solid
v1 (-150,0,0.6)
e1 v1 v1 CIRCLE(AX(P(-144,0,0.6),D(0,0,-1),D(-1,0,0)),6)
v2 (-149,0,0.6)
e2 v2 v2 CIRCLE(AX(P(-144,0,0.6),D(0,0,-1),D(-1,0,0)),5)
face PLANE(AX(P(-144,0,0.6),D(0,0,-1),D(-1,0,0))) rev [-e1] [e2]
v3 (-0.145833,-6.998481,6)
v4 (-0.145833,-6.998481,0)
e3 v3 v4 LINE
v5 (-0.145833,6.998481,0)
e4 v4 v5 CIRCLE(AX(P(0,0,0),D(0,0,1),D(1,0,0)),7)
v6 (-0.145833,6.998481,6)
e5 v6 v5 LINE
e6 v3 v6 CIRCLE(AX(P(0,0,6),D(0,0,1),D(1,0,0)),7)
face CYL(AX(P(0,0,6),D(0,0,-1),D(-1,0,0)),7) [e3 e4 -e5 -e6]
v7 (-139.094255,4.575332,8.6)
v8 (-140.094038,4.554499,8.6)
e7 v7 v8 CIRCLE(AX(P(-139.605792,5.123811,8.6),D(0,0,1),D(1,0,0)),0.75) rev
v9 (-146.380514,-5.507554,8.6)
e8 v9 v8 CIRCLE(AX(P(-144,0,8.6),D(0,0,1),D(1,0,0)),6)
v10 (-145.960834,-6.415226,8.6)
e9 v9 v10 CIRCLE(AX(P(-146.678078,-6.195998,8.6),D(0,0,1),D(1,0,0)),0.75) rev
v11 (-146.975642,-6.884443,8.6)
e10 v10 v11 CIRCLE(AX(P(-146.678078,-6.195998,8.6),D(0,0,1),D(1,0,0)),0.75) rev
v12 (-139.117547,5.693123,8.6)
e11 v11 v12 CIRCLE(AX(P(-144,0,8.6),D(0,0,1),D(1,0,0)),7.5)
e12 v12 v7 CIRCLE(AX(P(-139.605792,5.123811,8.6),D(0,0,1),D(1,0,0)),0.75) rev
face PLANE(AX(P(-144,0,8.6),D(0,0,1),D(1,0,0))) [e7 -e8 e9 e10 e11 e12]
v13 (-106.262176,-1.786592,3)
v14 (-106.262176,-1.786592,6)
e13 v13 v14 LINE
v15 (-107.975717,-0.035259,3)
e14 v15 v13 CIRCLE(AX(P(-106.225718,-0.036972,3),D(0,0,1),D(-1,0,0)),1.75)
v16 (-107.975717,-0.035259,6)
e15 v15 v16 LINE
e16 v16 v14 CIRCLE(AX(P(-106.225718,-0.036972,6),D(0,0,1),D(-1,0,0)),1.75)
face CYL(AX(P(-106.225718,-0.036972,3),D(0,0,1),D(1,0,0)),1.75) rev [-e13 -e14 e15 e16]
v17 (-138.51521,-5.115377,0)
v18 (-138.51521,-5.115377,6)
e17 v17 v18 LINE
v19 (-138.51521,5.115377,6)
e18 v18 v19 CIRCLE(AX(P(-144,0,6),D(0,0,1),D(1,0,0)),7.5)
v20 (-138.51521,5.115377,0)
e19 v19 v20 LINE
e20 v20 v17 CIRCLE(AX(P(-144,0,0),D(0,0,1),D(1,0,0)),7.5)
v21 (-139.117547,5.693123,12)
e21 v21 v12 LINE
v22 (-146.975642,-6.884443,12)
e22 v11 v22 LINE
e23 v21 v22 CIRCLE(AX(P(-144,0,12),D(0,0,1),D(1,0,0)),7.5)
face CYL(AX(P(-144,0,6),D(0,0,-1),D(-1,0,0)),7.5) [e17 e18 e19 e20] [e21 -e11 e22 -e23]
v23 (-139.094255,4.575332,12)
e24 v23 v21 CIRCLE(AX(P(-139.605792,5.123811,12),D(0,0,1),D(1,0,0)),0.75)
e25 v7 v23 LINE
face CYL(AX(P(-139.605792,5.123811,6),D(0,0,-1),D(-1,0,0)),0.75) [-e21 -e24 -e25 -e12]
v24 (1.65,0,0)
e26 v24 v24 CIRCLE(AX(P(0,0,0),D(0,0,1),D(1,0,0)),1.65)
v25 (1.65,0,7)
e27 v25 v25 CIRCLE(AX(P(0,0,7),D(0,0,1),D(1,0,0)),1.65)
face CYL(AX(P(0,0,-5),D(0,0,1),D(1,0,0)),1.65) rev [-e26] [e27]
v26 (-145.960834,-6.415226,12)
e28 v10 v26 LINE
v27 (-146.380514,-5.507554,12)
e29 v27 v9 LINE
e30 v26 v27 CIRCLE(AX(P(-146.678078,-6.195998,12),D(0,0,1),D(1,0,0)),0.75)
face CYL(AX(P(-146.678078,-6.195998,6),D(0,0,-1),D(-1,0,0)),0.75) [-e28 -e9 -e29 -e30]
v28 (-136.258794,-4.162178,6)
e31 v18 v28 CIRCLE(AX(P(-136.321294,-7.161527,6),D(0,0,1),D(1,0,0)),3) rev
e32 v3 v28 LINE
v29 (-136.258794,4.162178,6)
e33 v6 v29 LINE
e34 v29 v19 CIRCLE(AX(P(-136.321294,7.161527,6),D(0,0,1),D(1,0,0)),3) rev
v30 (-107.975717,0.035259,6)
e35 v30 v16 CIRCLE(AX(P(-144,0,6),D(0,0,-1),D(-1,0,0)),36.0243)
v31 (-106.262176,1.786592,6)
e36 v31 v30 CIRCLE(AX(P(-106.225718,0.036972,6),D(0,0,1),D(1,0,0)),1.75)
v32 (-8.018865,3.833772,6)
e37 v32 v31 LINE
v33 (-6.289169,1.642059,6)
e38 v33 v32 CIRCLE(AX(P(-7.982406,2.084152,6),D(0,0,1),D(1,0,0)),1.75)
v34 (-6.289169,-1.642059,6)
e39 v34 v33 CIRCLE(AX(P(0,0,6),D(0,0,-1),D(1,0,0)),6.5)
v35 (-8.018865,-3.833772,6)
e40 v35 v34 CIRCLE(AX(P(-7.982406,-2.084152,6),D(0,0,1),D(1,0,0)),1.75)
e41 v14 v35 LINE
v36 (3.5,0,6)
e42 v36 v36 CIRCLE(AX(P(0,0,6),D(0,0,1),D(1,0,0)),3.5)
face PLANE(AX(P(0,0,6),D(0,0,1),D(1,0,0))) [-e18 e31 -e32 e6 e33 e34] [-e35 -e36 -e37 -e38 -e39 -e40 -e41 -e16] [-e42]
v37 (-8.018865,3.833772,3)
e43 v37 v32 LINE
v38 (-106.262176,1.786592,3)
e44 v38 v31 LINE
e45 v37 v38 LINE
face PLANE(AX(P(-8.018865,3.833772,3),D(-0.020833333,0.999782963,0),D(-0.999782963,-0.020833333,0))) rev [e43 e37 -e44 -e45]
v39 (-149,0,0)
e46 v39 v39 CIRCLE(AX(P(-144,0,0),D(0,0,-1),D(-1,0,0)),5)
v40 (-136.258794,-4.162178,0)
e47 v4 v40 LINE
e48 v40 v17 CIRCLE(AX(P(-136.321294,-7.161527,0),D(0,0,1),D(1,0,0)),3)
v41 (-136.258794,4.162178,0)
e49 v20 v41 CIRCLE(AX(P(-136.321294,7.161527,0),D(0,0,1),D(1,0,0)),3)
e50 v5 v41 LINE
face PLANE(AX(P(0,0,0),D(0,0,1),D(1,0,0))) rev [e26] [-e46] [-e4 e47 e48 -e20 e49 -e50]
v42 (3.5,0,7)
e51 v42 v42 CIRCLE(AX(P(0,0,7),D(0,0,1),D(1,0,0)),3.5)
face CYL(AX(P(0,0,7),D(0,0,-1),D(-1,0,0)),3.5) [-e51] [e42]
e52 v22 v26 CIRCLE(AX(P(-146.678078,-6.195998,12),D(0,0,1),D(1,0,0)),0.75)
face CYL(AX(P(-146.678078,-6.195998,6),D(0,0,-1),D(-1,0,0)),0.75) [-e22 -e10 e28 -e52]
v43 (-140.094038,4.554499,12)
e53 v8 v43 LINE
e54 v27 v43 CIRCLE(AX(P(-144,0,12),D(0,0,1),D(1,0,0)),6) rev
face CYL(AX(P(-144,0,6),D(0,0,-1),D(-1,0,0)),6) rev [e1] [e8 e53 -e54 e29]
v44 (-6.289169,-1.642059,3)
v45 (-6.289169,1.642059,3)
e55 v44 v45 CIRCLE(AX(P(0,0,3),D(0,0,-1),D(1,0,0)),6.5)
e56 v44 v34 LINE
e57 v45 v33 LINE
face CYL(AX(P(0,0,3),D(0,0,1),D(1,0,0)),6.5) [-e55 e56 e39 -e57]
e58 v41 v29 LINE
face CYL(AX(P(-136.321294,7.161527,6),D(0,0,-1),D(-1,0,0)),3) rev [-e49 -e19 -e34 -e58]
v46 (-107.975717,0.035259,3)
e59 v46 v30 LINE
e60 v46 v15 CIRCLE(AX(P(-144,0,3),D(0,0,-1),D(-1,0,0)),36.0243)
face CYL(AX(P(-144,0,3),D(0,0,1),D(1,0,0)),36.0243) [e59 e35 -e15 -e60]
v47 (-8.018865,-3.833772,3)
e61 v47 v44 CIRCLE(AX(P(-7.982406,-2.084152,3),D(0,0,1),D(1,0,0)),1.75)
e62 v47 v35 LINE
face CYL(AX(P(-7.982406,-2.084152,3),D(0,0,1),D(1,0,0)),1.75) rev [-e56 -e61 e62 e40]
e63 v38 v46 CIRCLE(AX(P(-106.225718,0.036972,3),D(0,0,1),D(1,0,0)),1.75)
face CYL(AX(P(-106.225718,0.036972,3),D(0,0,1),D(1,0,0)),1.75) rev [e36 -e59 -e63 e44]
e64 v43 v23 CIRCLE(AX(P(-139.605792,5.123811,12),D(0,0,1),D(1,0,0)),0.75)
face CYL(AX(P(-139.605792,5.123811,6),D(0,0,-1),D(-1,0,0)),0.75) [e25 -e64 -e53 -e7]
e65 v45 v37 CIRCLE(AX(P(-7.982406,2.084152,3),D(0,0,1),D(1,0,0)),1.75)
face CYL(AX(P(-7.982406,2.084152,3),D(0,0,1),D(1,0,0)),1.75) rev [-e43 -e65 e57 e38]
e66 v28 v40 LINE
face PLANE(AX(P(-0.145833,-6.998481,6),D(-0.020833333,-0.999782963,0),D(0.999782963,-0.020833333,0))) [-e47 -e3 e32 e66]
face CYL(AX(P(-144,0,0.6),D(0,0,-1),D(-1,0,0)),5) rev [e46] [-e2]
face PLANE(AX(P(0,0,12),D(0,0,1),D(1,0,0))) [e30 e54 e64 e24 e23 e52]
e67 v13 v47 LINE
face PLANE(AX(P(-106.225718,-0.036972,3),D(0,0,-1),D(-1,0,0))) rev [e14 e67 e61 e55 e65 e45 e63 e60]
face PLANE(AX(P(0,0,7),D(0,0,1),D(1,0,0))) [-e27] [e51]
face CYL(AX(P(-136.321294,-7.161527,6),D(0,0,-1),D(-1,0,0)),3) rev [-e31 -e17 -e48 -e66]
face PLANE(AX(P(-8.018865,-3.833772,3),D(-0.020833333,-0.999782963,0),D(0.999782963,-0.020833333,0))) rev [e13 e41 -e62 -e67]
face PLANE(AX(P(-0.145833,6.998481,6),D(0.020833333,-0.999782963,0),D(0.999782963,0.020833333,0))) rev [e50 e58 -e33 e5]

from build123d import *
from build123d.topology import SkipClean

# Parameters (mm, degrees)
SKETCH1_R           = 6
BOSS_EXTRUDE1_DEPTH = 6
SKETCH2_R           = 3.5
BOSS_EXTRUDE2_DEPTH = 1
SKETCH4_R           = 1.65
CUT_EXTRUDE1_DEPTH  = 12
SKETCH6_R           = 6
SKETCH6_R_2         = 5
BOSS_EXTRUDE4_DEPTH = 0.6
FILLET3_R           = 3
BOSS_EXTRUDE5_DEPTH = 6
FILLET1_START       = 6
FILLET1_DEPTH       = 7
CUT_EXTRUDE2_DEPTH  = 3
SKETCH9_R           = 7.5
SKETCH9_R_2         = 6
BOSS_EXTRUDE6_DEPTH = 2.6


with BuildPart() as part:
    # Sketch1 → Boss-Extrude1 (new body)
    with BuildSketch(Plane.XY):
        with BuildLine():
            ThreePointArc((-0.145833333, -6.998480738), (7, 0), (-0.145833333, 6.998480738))
            Line((-0.145833333, 6.998480738), (-137.740421511, 4.131304533))
            ThreePointArc((-137.740421511, 4.131304533), (-151.5, 0), (-137.740421511, -4.131304533))
            Line((-137.740421511, -4.131304533), (-0.145833333, -6.998480738))
        make_face()
        with Locations((-144, 0)):
            Circle(SKETCH1_R, mode=Mode.SUBTRACT)
    extrude(amount=BOSS_EXTRUDE1_DEPTH)

    # Sketch2 → Boss-Extrude2 (add)
    with BuildSketch(Plane.XY.offset(6)):
        Circle(SKETCH2_R)
    extrude(amount=BOSS_EXTRUDE2_DEPTH)

    # Sketch4 → Cut-Extrude1 (cut)
    with BuildSketch(Plane.XY.offset(7)):
        Circle(SKETCH4_R)
    extrude(amount=-CUT_EXTRUDE1_DEPTH, mode=Mode.SUBTRACT)

    # Sketch6 → Boss-Extrude4 (add)
    with BuildSketch(Plane(origin=(0, 0, 0), x_dir=(-1, 0, 0), z_dir=(0, 0, -1))):
        with Locations((144, 0)):
            Circle(SKETCH6_R)
        with Locations((144, 0)):
            Circle(SKETCH6_R_2, mode=Mode.SUBTRACT)
    extrude(amount=-BOSS_EXTRUDE4_DEPTH)

    # Fillet3
    fillet3_edges = [part.edges().sort_by_distance(p)[0] for p in [
        (-137.740421511, -4.131304533, 3),
        (-137.740421511, 4.131304533, 3),
    ]]
    fillet(fillet3_edges, radius=FILLET3_R)

    # Sketch7 → Boss-Extrude5 (add)
    with SkipClean():  # the faces are left unmerged after this step: merging them gives an invalid solid
        with BuildSketch(Plane.XY.offset(6)):
            with BuildLine():
                ThreePointArc((-145.753823306, -5.737952929), (-149.088514051, 3.179154723), (-139.612167999, 4.092301349))
                Line((-139.612167999, 4.092301349), (-138.515209999, 5.115376687))
                ThreePointArc((-138.515209999, 5.115376687), (-150.360642563, 3.973943404), (-146.192279132, -7.172441161))
                Line((-146.192279132, -7.172441161), (-145.753823306, -5.737952929))
            make_face()
        extrude(amount=BOSS_EXTRUDE5_DEPTH)

    # Fillet1: read off the stored shape, not the designer's step
    # Fillet1 outline → Fillet1 (cut)
    with SkipClean():  # the faces are left unmerged after this step: merging them gives an invalid solid
        with BuildSketch(Plane.XY.offset(FILLET1_START)):
            with BuildLine():
                ThreePointArc((-145.753823306, -5.737952929), (-146.070376054, -5.631477869), (-146.380513939, -5.507554211))
                ThreePointArc((-146.380513939, -5.507554211), (-145.99732404, -5.881238582), (-145.960834066, -6.4152264))
                Line((-145.960834066, -6.4152264), (-145.753823306, -5.737952929))
            make_face()
            with BuildLine():
                Line((-146.192279132, -7.172441161), (-145.960834066, -6.4152264))
                ThreePointArc((-145.960834066, -6.4152264), (-146.363318277, -6.876752629), (-146.975642424, -6.884442763))
                ThreePointArc((-146.975642424, -6.884442763), (-146.587970068, -7.039347337), (-146.192279132, -7.172441161))
            make_face()
            with BuildLine():
                ThreePointArc((-139.094254686, 4.575332001), (-139.590167355, 4.373973779), (-140.094037649, 4.554498667))
                ThreePointArc((-140.094037649, 4.554498667), (-139.846668472, 4.330108223), (-139.612167999, 4.092301349))
                Line((-139.612167999, 4.092301349), (-139.094254686, 4.575332001))
            make_face()
            with BuildLine():
                ThreePointArc((-139.117547061, 5.693123334), (-138.855955133, 5.139436001), (-139.094254686, 4.575332001))
                Line((-139.094254686, 4.575332001), (-138.515209999, 5.115376687))
                ThreePointArc((-138.515209999, 5.115376687), (-138.80833559, 5.412635279), (-139.117547061, 5.693123334))
            make_face()
        extrude(amount=FILLET1_DEPTH, mode=Mode.SUBTRACT)

    # Sketch8 → Cut-Extrude2 (cut)
    with SkipClean():  # the faces are left unmerged after this step: merging them gives an invalid solid
        with BuildSketch(Plane.XY.offset(6)):
            with BuildLine():
                Line((-8.018864585, 3.833772393), (-106.262176435, 1.786592415))
                ThreePointArc((-106.262176435, 1.786592415), (-107.476577581, 1.260839283), (-107.975717263, 0.035259389))
                ThreePointArc((-107.975717263, 0.035259389), (-107.975700008, 0), (-107.975717263, -0.035259389))
                ThreePointArc((-107.975717263, -0.035259389), (-107.476577581, -1.260839283), (-106.262176435, -1.786592415))
                Line((-106.262176435, -1.786592415), (-8.018864585, -3.833772393))
                ThreePointArc((-8.018864585, -3.833772393), (-6.60867738, -3.168296566), (-6.289168562, -1.642059316))
                ThreePointArc((-6.289168562, -1.642059316), (-6.5, 0), (-6.289168562, 1.642059316))
                ThreePointArc((-6.289168562, 1.642059316), (-6.60867738, 3.168296566), (-8.018864585, 3.833772393))
            make_face()
        extrude(amount=-CUT_EXTRUDE2_DEPTH, mode=Mode.SUBTRACT)

    # Sketch9 → Boss-Extrude6 (add)
    with BuildSketch(Plane.XY.offset(6)):
        with Locations(Location((-144, 0, 0), (0, 0, 246.624693124))):
            Circle(SKETCH9_R)
        with Locations(Location((-144, 0, 0), (0, 0, 180))):
            Circle(SKETCH9_R_2, mode=Mode.SUBTRACT)
    extrude(amount=BOSS_EXTRUDE6_DEPTH)


solid = part.part
